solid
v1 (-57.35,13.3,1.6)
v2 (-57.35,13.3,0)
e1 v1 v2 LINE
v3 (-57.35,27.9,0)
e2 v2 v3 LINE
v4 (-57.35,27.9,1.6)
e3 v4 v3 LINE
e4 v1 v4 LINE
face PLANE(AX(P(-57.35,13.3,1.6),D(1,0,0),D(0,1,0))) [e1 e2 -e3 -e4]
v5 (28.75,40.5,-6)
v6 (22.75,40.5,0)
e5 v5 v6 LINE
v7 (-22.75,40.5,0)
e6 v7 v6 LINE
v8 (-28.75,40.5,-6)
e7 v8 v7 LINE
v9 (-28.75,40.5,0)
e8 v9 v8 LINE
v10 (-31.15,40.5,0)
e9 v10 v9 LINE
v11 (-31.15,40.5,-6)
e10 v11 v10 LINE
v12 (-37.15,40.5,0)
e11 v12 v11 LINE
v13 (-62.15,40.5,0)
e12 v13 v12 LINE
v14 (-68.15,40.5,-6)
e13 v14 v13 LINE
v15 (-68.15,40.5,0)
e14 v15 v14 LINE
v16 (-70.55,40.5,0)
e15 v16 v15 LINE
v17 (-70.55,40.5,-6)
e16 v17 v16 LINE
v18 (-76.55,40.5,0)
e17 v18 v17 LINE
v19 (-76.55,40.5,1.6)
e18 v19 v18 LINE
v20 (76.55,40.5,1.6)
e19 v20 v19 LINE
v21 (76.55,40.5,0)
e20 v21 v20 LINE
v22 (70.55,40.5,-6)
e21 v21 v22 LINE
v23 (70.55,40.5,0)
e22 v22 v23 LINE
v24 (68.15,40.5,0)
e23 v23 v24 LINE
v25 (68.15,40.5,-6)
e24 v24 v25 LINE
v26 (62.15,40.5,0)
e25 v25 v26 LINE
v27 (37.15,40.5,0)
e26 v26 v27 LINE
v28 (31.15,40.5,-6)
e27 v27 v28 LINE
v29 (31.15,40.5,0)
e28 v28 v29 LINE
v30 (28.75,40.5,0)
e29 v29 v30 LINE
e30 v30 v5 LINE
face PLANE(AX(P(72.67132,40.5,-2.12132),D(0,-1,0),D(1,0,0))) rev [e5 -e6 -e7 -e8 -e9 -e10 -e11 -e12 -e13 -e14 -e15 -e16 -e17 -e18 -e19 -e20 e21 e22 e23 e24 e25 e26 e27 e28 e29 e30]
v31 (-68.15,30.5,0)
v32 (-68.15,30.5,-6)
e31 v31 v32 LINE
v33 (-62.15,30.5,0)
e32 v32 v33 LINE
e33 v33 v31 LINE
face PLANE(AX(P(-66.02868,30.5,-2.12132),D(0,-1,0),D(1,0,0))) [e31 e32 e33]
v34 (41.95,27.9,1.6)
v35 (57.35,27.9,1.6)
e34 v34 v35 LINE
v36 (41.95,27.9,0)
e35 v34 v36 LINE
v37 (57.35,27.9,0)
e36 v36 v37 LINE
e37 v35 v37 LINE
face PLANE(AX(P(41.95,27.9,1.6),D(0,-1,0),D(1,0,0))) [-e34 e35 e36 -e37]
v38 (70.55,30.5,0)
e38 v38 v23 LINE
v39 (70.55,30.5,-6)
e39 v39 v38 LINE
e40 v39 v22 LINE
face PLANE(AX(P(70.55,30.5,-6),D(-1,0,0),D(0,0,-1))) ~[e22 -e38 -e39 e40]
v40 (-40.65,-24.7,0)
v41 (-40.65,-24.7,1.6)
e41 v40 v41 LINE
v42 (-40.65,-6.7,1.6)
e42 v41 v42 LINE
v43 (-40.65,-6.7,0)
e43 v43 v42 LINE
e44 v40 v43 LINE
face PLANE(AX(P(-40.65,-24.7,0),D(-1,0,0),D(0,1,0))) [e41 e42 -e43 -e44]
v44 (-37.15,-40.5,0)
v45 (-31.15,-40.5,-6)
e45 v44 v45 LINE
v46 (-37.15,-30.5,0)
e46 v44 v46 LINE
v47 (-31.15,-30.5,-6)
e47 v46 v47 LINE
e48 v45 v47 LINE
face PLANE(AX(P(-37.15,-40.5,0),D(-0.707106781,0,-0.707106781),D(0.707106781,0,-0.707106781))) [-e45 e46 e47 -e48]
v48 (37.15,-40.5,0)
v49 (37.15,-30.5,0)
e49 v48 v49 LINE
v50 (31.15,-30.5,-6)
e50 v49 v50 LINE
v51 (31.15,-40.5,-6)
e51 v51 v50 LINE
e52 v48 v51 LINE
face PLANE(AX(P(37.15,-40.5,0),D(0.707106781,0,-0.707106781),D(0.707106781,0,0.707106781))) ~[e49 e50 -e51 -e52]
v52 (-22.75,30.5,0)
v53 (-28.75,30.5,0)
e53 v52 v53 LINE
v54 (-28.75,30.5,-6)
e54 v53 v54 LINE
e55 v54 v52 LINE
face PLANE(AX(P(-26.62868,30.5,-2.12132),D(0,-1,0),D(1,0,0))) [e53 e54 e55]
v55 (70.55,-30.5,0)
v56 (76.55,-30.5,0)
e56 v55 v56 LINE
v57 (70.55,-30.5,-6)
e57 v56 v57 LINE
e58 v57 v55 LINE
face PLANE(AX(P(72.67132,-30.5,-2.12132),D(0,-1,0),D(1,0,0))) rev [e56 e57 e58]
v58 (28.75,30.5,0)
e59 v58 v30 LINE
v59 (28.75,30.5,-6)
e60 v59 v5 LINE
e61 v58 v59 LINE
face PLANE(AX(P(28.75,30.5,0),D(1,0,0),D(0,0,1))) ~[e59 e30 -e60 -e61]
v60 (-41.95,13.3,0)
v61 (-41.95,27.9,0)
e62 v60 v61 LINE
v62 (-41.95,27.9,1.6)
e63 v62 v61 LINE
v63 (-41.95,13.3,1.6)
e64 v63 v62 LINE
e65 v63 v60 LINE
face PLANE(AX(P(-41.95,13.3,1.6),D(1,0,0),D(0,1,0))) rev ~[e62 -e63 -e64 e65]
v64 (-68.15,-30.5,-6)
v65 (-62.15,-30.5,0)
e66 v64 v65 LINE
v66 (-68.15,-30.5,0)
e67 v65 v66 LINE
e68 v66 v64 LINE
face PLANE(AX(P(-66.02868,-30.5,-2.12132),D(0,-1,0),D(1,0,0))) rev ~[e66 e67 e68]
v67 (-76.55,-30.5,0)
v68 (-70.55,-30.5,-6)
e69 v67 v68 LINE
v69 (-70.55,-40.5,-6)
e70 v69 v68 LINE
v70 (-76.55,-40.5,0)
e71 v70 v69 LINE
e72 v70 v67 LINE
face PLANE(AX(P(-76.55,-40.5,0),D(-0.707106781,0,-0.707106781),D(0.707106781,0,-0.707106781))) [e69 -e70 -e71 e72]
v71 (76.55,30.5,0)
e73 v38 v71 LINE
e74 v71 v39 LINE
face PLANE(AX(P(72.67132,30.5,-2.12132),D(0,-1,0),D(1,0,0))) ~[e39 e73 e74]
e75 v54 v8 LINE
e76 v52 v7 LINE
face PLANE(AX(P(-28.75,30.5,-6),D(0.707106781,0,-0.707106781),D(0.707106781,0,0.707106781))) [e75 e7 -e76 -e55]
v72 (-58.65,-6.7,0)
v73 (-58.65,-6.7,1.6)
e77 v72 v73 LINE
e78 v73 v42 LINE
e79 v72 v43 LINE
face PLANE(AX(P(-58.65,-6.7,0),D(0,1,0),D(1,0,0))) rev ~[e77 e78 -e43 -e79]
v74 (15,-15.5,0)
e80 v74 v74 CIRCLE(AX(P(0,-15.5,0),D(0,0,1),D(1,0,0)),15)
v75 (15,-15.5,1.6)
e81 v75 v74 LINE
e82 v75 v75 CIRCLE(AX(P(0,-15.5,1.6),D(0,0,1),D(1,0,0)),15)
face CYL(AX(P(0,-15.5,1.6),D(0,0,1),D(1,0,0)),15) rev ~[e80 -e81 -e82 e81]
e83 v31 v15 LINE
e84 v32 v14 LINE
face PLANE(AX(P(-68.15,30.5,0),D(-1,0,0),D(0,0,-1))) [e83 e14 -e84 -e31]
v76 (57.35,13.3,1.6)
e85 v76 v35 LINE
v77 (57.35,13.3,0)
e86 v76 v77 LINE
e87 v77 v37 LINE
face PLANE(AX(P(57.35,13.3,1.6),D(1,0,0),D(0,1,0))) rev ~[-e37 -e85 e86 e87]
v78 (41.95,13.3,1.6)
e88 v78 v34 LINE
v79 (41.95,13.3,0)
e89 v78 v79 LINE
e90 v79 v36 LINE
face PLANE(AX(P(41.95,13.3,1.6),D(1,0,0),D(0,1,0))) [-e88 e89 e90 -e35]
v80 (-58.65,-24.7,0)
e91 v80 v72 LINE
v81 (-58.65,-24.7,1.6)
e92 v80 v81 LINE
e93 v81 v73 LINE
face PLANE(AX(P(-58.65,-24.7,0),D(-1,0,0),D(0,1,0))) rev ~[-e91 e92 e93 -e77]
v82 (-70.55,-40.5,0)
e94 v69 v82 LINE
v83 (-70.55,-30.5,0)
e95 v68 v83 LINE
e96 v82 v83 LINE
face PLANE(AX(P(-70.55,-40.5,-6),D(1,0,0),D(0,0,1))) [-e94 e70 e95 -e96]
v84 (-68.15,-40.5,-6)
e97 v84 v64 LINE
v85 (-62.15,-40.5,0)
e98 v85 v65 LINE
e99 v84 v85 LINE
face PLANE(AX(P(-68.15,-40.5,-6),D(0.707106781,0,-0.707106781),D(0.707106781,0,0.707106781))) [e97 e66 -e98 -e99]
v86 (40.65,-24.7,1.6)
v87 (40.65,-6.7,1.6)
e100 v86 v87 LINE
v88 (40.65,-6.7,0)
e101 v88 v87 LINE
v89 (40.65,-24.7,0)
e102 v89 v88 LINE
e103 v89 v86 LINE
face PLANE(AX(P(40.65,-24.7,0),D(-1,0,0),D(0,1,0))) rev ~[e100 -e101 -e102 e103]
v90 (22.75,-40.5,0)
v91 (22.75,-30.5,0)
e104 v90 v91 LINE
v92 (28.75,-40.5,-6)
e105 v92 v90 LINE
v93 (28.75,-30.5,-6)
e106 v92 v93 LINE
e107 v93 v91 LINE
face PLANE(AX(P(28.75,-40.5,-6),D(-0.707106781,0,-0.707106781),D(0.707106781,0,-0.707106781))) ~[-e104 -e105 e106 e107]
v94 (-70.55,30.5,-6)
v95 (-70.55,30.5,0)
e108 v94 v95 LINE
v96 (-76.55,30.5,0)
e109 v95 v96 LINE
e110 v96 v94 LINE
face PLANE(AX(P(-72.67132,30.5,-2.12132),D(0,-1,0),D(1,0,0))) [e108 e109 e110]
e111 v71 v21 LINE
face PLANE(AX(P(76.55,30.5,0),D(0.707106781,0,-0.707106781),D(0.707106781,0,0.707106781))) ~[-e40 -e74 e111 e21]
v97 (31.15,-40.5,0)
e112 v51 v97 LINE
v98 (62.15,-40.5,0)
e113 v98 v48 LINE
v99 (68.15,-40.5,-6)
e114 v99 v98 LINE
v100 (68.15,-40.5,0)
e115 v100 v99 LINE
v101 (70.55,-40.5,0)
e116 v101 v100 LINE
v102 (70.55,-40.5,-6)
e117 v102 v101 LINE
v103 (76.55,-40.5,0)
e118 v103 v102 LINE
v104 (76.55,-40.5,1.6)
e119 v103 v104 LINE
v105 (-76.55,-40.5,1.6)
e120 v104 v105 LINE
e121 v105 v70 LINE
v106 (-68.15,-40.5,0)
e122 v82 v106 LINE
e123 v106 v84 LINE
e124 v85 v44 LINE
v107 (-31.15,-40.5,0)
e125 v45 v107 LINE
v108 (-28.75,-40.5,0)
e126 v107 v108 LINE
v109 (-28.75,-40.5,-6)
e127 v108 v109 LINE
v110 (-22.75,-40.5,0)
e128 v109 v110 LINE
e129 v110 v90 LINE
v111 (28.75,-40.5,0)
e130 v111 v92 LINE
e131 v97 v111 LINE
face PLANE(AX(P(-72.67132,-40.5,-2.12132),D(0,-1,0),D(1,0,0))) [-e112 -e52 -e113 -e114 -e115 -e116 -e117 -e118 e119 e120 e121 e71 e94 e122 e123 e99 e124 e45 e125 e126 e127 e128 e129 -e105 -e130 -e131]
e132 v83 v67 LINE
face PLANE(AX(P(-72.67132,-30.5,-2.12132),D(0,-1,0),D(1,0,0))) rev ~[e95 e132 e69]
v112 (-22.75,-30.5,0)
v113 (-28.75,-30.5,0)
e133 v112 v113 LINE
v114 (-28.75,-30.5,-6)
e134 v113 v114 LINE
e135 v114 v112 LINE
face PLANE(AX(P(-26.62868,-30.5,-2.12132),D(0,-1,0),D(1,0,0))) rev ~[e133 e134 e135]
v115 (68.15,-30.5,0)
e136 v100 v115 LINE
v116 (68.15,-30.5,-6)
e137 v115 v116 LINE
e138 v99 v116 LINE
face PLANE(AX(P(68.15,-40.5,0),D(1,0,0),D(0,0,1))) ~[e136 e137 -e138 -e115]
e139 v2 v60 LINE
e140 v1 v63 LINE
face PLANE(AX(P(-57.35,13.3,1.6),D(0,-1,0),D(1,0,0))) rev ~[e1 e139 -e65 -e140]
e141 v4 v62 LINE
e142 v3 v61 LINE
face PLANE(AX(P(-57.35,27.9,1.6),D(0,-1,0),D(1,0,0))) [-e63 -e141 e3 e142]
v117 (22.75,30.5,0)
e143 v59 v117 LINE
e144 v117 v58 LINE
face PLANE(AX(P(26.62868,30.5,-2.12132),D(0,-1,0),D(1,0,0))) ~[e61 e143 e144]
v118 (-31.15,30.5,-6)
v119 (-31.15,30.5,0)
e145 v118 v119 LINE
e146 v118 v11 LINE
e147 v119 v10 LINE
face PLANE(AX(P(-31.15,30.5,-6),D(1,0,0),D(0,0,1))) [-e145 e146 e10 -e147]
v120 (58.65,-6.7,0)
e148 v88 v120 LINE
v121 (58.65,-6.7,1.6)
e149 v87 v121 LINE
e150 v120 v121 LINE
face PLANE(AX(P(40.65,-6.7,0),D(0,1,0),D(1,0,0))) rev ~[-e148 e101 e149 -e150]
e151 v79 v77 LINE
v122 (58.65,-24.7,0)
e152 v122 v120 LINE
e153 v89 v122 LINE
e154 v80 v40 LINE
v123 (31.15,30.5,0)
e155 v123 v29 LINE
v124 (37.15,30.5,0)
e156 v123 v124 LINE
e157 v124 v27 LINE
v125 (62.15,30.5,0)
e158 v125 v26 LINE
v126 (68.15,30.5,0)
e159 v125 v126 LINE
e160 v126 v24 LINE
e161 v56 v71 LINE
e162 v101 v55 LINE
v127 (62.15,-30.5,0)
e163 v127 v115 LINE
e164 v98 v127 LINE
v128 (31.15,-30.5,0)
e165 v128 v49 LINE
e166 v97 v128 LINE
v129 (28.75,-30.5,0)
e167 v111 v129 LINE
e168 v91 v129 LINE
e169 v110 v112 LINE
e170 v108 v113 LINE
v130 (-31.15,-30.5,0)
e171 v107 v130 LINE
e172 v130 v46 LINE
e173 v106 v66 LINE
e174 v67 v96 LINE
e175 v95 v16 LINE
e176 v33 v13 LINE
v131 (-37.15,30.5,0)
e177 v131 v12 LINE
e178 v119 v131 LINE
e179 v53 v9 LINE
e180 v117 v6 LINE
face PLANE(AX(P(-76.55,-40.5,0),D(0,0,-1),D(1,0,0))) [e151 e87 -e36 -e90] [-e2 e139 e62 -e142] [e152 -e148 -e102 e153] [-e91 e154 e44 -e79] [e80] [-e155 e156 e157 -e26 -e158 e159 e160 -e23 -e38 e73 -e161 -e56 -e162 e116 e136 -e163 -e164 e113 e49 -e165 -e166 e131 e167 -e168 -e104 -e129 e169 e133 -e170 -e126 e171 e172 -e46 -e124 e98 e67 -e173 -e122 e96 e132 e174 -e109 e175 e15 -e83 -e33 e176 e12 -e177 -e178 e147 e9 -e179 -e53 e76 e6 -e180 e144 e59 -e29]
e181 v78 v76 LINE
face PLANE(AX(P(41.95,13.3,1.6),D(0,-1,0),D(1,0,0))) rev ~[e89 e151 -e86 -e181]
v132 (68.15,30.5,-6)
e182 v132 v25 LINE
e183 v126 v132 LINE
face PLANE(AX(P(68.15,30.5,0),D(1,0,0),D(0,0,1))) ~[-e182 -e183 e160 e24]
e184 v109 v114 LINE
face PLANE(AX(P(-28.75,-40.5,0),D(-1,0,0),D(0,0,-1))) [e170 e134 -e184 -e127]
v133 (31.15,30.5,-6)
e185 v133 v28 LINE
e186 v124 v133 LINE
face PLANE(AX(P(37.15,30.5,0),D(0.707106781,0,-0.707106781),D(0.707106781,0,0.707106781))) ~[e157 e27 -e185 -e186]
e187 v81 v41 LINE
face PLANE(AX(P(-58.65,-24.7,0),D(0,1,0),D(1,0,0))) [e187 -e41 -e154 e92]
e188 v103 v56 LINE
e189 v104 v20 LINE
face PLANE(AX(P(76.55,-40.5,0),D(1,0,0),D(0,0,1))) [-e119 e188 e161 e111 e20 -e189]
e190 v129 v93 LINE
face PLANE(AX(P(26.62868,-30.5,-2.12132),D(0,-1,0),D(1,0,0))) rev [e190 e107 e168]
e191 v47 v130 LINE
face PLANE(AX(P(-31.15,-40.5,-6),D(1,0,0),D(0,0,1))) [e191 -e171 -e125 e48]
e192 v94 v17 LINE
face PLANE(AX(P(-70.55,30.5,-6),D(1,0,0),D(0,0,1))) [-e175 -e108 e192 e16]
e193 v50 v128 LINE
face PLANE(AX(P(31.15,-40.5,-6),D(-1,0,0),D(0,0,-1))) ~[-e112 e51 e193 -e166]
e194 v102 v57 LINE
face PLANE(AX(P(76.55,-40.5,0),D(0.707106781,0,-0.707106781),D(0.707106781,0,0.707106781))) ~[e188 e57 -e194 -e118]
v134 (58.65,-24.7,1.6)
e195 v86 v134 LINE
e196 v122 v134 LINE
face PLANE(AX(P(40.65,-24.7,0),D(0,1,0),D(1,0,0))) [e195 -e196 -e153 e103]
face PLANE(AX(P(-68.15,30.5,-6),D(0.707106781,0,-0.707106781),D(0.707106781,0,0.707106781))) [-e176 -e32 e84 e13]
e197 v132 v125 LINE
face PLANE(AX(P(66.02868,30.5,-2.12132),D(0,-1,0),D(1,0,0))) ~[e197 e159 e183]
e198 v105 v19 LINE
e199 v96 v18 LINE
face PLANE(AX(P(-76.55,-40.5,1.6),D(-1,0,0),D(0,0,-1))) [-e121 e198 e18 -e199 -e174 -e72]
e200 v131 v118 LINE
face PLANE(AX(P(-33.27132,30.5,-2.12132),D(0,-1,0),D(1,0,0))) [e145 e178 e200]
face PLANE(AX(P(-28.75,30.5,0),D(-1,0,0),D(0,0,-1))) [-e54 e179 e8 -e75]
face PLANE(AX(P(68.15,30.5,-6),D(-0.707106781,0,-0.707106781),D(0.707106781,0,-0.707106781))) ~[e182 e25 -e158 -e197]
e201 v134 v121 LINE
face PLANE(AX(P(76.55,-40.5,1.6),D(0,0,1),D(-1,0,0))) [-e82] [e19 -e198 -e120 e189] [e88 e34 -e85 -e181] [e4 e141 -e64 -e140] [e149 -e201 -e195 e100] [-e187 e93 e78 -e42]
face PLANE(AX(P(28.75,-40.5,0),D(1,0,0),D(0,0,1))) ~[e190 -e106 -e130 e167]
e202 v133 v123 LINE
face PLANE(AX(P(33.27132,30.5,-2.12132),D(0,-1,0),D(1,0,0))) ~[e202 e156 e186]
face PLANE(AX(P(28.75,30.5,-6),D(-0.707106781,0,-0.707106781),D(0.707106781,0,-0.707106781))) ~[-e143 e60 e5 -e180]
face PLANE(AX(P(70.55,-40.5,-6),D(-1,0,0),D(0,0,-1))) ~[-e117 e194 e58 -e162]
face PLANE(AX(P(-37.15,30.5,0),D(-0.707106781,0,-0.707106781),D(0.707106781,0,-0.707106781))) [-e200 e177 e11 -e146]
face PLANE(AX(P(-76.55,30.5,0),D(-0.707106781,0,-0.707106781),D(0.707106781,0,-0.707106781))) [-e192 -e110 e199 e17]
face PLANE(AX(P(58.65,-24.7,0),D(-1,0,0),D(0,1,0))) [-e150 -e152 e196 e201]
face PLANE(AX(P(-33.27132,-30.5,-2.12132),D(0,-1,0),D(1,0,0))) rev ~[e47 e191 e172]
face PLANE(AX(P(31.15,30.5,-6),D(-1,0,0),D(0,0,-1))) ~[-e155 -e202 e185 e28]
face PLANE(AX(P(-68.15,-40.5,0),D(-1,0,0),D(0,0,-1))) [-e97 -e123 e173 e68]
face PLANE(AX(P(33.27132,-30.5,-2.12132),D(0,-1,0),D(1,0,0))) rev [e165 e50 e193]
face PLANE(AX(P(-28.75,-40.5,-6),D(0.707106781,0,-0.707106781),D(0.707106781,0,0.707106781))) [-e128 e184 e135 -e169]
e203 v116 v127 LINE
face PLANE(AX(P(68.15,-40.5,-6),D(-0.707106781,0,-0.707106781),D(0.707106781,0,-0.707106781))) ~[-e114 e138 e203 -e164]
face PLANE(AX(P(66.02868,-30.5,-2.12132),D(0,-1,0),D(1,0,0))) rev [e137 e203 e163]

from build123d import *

# Parameters (mm, degrees)
F2_DEPTH  = 81
F3_DEPTH  = 10
F4_START  = -71
F4_DEPTH  = 10
F8_R      = 15
F9_DEPTH  = 1.6
F10_W     = 15.4
F10_H     = 14.6
F11_DEPTH = 1.6
F12_W     = 18
F12_H     = 18
F13_DEPTH = 1.6


# Not quite as in the source:
# - a feature names something its author has since deleted; it is built from what else it names


with BuildPart() as f2:
    # F1 (on offset) → F2 (new body)
    with BuildSketch(Plane.XZ.offset(40.5)):
        Polygon((76.55, 0), (76.55, 1.6), (-76.55, 1.6), (-76.55, 0), (-70.55, 0), (-68.15, 0), (-62.15, 0), (-37.15, 0), (-31.15, 0), (-28.75, 0), (-22.75, 0), (22.75, 0), (28.75, 0), (31.15, 0), (37.15, 0), (62.15, 0), (68.15, 0), (70.55, 0), align=None)
    extrude(amount=-F2_DEPTH)

    # F1 (on offset) → F3 (join)
    with BuildSketch(Plane.XZ.offset(40.5)):
        Polygon((-62.15, 0), (-68.15, 0), (-68.15, -6), align=None)
        Polygon((-31.15, 0), (-37.15, 0), (-31.15, -6), align=None)
        Polygon((-22.75, 0), (-28.75, 0), (-28.75, -6), align=None)
        Polygon((-70.55, 0), (-76.55, 0), (-70.55, -6), align=None)
    extrude(amount=-F3_DEPTH)

    # F1 (on offset) → F4 (join)
    with BuildSketch(Plane.XZ.offset(40.5).offset(F4_START)):
        Polygon((-62.15, 0), (-68.15, 0), (-68.15, -6), align=None)
        Polygon((-31.15, 0), (-37.15, 0), (-31.15, -6), align=None)
        Polygon((-22.75, 0), (-28.75, 0), (-28.75, -6), align=None)
        Polygon((-70.55, 0), (-76.55, 0), (-70.55, -6), align=None)
    extrude(amount=-F4_DEPTH)

    # F7: F2 across plane


with BuildPart() as f2_1:
    add(f2.part)
    add(f2.part.mirror(Plane.YZ))

    # F8 (on face) → F9 (cut)
    with BuildSketch(Plane.XY.offset(1.6)):
        with Locations((0, -15.5)):
            Circle(F8_R)
    extrude(amount=-F9_DEPTH, mode=Mode.SUBTRACT)

    # F10 (on face) → F11 (cut)
    with BuildSketch(Plane.XY.offset(1.6)):
        with Locations((-49.65, 20.6)):
            Rectangle(F10_W, F10_H)
        with Locations((49.65, 20.6)):
            Rectangle(F10_W, F10_H)
    extrude(amount=-F11_DEPTH, mode=Mode.SUBTRACT)

    # F12 (on Top) → F13 (cut)
    with BuildSketch(Plane.XY):
        with Locations((-49.65, -15.7)):
            Rectangle(F12_W, F12_H)
        with Locations((49.65, -15.7)):
            Rectangle(F12_W, F12_H)
    extrude(amount=F13_DEPTH, mode=Mode.SUBTRACT)


solid = f2_1.part
